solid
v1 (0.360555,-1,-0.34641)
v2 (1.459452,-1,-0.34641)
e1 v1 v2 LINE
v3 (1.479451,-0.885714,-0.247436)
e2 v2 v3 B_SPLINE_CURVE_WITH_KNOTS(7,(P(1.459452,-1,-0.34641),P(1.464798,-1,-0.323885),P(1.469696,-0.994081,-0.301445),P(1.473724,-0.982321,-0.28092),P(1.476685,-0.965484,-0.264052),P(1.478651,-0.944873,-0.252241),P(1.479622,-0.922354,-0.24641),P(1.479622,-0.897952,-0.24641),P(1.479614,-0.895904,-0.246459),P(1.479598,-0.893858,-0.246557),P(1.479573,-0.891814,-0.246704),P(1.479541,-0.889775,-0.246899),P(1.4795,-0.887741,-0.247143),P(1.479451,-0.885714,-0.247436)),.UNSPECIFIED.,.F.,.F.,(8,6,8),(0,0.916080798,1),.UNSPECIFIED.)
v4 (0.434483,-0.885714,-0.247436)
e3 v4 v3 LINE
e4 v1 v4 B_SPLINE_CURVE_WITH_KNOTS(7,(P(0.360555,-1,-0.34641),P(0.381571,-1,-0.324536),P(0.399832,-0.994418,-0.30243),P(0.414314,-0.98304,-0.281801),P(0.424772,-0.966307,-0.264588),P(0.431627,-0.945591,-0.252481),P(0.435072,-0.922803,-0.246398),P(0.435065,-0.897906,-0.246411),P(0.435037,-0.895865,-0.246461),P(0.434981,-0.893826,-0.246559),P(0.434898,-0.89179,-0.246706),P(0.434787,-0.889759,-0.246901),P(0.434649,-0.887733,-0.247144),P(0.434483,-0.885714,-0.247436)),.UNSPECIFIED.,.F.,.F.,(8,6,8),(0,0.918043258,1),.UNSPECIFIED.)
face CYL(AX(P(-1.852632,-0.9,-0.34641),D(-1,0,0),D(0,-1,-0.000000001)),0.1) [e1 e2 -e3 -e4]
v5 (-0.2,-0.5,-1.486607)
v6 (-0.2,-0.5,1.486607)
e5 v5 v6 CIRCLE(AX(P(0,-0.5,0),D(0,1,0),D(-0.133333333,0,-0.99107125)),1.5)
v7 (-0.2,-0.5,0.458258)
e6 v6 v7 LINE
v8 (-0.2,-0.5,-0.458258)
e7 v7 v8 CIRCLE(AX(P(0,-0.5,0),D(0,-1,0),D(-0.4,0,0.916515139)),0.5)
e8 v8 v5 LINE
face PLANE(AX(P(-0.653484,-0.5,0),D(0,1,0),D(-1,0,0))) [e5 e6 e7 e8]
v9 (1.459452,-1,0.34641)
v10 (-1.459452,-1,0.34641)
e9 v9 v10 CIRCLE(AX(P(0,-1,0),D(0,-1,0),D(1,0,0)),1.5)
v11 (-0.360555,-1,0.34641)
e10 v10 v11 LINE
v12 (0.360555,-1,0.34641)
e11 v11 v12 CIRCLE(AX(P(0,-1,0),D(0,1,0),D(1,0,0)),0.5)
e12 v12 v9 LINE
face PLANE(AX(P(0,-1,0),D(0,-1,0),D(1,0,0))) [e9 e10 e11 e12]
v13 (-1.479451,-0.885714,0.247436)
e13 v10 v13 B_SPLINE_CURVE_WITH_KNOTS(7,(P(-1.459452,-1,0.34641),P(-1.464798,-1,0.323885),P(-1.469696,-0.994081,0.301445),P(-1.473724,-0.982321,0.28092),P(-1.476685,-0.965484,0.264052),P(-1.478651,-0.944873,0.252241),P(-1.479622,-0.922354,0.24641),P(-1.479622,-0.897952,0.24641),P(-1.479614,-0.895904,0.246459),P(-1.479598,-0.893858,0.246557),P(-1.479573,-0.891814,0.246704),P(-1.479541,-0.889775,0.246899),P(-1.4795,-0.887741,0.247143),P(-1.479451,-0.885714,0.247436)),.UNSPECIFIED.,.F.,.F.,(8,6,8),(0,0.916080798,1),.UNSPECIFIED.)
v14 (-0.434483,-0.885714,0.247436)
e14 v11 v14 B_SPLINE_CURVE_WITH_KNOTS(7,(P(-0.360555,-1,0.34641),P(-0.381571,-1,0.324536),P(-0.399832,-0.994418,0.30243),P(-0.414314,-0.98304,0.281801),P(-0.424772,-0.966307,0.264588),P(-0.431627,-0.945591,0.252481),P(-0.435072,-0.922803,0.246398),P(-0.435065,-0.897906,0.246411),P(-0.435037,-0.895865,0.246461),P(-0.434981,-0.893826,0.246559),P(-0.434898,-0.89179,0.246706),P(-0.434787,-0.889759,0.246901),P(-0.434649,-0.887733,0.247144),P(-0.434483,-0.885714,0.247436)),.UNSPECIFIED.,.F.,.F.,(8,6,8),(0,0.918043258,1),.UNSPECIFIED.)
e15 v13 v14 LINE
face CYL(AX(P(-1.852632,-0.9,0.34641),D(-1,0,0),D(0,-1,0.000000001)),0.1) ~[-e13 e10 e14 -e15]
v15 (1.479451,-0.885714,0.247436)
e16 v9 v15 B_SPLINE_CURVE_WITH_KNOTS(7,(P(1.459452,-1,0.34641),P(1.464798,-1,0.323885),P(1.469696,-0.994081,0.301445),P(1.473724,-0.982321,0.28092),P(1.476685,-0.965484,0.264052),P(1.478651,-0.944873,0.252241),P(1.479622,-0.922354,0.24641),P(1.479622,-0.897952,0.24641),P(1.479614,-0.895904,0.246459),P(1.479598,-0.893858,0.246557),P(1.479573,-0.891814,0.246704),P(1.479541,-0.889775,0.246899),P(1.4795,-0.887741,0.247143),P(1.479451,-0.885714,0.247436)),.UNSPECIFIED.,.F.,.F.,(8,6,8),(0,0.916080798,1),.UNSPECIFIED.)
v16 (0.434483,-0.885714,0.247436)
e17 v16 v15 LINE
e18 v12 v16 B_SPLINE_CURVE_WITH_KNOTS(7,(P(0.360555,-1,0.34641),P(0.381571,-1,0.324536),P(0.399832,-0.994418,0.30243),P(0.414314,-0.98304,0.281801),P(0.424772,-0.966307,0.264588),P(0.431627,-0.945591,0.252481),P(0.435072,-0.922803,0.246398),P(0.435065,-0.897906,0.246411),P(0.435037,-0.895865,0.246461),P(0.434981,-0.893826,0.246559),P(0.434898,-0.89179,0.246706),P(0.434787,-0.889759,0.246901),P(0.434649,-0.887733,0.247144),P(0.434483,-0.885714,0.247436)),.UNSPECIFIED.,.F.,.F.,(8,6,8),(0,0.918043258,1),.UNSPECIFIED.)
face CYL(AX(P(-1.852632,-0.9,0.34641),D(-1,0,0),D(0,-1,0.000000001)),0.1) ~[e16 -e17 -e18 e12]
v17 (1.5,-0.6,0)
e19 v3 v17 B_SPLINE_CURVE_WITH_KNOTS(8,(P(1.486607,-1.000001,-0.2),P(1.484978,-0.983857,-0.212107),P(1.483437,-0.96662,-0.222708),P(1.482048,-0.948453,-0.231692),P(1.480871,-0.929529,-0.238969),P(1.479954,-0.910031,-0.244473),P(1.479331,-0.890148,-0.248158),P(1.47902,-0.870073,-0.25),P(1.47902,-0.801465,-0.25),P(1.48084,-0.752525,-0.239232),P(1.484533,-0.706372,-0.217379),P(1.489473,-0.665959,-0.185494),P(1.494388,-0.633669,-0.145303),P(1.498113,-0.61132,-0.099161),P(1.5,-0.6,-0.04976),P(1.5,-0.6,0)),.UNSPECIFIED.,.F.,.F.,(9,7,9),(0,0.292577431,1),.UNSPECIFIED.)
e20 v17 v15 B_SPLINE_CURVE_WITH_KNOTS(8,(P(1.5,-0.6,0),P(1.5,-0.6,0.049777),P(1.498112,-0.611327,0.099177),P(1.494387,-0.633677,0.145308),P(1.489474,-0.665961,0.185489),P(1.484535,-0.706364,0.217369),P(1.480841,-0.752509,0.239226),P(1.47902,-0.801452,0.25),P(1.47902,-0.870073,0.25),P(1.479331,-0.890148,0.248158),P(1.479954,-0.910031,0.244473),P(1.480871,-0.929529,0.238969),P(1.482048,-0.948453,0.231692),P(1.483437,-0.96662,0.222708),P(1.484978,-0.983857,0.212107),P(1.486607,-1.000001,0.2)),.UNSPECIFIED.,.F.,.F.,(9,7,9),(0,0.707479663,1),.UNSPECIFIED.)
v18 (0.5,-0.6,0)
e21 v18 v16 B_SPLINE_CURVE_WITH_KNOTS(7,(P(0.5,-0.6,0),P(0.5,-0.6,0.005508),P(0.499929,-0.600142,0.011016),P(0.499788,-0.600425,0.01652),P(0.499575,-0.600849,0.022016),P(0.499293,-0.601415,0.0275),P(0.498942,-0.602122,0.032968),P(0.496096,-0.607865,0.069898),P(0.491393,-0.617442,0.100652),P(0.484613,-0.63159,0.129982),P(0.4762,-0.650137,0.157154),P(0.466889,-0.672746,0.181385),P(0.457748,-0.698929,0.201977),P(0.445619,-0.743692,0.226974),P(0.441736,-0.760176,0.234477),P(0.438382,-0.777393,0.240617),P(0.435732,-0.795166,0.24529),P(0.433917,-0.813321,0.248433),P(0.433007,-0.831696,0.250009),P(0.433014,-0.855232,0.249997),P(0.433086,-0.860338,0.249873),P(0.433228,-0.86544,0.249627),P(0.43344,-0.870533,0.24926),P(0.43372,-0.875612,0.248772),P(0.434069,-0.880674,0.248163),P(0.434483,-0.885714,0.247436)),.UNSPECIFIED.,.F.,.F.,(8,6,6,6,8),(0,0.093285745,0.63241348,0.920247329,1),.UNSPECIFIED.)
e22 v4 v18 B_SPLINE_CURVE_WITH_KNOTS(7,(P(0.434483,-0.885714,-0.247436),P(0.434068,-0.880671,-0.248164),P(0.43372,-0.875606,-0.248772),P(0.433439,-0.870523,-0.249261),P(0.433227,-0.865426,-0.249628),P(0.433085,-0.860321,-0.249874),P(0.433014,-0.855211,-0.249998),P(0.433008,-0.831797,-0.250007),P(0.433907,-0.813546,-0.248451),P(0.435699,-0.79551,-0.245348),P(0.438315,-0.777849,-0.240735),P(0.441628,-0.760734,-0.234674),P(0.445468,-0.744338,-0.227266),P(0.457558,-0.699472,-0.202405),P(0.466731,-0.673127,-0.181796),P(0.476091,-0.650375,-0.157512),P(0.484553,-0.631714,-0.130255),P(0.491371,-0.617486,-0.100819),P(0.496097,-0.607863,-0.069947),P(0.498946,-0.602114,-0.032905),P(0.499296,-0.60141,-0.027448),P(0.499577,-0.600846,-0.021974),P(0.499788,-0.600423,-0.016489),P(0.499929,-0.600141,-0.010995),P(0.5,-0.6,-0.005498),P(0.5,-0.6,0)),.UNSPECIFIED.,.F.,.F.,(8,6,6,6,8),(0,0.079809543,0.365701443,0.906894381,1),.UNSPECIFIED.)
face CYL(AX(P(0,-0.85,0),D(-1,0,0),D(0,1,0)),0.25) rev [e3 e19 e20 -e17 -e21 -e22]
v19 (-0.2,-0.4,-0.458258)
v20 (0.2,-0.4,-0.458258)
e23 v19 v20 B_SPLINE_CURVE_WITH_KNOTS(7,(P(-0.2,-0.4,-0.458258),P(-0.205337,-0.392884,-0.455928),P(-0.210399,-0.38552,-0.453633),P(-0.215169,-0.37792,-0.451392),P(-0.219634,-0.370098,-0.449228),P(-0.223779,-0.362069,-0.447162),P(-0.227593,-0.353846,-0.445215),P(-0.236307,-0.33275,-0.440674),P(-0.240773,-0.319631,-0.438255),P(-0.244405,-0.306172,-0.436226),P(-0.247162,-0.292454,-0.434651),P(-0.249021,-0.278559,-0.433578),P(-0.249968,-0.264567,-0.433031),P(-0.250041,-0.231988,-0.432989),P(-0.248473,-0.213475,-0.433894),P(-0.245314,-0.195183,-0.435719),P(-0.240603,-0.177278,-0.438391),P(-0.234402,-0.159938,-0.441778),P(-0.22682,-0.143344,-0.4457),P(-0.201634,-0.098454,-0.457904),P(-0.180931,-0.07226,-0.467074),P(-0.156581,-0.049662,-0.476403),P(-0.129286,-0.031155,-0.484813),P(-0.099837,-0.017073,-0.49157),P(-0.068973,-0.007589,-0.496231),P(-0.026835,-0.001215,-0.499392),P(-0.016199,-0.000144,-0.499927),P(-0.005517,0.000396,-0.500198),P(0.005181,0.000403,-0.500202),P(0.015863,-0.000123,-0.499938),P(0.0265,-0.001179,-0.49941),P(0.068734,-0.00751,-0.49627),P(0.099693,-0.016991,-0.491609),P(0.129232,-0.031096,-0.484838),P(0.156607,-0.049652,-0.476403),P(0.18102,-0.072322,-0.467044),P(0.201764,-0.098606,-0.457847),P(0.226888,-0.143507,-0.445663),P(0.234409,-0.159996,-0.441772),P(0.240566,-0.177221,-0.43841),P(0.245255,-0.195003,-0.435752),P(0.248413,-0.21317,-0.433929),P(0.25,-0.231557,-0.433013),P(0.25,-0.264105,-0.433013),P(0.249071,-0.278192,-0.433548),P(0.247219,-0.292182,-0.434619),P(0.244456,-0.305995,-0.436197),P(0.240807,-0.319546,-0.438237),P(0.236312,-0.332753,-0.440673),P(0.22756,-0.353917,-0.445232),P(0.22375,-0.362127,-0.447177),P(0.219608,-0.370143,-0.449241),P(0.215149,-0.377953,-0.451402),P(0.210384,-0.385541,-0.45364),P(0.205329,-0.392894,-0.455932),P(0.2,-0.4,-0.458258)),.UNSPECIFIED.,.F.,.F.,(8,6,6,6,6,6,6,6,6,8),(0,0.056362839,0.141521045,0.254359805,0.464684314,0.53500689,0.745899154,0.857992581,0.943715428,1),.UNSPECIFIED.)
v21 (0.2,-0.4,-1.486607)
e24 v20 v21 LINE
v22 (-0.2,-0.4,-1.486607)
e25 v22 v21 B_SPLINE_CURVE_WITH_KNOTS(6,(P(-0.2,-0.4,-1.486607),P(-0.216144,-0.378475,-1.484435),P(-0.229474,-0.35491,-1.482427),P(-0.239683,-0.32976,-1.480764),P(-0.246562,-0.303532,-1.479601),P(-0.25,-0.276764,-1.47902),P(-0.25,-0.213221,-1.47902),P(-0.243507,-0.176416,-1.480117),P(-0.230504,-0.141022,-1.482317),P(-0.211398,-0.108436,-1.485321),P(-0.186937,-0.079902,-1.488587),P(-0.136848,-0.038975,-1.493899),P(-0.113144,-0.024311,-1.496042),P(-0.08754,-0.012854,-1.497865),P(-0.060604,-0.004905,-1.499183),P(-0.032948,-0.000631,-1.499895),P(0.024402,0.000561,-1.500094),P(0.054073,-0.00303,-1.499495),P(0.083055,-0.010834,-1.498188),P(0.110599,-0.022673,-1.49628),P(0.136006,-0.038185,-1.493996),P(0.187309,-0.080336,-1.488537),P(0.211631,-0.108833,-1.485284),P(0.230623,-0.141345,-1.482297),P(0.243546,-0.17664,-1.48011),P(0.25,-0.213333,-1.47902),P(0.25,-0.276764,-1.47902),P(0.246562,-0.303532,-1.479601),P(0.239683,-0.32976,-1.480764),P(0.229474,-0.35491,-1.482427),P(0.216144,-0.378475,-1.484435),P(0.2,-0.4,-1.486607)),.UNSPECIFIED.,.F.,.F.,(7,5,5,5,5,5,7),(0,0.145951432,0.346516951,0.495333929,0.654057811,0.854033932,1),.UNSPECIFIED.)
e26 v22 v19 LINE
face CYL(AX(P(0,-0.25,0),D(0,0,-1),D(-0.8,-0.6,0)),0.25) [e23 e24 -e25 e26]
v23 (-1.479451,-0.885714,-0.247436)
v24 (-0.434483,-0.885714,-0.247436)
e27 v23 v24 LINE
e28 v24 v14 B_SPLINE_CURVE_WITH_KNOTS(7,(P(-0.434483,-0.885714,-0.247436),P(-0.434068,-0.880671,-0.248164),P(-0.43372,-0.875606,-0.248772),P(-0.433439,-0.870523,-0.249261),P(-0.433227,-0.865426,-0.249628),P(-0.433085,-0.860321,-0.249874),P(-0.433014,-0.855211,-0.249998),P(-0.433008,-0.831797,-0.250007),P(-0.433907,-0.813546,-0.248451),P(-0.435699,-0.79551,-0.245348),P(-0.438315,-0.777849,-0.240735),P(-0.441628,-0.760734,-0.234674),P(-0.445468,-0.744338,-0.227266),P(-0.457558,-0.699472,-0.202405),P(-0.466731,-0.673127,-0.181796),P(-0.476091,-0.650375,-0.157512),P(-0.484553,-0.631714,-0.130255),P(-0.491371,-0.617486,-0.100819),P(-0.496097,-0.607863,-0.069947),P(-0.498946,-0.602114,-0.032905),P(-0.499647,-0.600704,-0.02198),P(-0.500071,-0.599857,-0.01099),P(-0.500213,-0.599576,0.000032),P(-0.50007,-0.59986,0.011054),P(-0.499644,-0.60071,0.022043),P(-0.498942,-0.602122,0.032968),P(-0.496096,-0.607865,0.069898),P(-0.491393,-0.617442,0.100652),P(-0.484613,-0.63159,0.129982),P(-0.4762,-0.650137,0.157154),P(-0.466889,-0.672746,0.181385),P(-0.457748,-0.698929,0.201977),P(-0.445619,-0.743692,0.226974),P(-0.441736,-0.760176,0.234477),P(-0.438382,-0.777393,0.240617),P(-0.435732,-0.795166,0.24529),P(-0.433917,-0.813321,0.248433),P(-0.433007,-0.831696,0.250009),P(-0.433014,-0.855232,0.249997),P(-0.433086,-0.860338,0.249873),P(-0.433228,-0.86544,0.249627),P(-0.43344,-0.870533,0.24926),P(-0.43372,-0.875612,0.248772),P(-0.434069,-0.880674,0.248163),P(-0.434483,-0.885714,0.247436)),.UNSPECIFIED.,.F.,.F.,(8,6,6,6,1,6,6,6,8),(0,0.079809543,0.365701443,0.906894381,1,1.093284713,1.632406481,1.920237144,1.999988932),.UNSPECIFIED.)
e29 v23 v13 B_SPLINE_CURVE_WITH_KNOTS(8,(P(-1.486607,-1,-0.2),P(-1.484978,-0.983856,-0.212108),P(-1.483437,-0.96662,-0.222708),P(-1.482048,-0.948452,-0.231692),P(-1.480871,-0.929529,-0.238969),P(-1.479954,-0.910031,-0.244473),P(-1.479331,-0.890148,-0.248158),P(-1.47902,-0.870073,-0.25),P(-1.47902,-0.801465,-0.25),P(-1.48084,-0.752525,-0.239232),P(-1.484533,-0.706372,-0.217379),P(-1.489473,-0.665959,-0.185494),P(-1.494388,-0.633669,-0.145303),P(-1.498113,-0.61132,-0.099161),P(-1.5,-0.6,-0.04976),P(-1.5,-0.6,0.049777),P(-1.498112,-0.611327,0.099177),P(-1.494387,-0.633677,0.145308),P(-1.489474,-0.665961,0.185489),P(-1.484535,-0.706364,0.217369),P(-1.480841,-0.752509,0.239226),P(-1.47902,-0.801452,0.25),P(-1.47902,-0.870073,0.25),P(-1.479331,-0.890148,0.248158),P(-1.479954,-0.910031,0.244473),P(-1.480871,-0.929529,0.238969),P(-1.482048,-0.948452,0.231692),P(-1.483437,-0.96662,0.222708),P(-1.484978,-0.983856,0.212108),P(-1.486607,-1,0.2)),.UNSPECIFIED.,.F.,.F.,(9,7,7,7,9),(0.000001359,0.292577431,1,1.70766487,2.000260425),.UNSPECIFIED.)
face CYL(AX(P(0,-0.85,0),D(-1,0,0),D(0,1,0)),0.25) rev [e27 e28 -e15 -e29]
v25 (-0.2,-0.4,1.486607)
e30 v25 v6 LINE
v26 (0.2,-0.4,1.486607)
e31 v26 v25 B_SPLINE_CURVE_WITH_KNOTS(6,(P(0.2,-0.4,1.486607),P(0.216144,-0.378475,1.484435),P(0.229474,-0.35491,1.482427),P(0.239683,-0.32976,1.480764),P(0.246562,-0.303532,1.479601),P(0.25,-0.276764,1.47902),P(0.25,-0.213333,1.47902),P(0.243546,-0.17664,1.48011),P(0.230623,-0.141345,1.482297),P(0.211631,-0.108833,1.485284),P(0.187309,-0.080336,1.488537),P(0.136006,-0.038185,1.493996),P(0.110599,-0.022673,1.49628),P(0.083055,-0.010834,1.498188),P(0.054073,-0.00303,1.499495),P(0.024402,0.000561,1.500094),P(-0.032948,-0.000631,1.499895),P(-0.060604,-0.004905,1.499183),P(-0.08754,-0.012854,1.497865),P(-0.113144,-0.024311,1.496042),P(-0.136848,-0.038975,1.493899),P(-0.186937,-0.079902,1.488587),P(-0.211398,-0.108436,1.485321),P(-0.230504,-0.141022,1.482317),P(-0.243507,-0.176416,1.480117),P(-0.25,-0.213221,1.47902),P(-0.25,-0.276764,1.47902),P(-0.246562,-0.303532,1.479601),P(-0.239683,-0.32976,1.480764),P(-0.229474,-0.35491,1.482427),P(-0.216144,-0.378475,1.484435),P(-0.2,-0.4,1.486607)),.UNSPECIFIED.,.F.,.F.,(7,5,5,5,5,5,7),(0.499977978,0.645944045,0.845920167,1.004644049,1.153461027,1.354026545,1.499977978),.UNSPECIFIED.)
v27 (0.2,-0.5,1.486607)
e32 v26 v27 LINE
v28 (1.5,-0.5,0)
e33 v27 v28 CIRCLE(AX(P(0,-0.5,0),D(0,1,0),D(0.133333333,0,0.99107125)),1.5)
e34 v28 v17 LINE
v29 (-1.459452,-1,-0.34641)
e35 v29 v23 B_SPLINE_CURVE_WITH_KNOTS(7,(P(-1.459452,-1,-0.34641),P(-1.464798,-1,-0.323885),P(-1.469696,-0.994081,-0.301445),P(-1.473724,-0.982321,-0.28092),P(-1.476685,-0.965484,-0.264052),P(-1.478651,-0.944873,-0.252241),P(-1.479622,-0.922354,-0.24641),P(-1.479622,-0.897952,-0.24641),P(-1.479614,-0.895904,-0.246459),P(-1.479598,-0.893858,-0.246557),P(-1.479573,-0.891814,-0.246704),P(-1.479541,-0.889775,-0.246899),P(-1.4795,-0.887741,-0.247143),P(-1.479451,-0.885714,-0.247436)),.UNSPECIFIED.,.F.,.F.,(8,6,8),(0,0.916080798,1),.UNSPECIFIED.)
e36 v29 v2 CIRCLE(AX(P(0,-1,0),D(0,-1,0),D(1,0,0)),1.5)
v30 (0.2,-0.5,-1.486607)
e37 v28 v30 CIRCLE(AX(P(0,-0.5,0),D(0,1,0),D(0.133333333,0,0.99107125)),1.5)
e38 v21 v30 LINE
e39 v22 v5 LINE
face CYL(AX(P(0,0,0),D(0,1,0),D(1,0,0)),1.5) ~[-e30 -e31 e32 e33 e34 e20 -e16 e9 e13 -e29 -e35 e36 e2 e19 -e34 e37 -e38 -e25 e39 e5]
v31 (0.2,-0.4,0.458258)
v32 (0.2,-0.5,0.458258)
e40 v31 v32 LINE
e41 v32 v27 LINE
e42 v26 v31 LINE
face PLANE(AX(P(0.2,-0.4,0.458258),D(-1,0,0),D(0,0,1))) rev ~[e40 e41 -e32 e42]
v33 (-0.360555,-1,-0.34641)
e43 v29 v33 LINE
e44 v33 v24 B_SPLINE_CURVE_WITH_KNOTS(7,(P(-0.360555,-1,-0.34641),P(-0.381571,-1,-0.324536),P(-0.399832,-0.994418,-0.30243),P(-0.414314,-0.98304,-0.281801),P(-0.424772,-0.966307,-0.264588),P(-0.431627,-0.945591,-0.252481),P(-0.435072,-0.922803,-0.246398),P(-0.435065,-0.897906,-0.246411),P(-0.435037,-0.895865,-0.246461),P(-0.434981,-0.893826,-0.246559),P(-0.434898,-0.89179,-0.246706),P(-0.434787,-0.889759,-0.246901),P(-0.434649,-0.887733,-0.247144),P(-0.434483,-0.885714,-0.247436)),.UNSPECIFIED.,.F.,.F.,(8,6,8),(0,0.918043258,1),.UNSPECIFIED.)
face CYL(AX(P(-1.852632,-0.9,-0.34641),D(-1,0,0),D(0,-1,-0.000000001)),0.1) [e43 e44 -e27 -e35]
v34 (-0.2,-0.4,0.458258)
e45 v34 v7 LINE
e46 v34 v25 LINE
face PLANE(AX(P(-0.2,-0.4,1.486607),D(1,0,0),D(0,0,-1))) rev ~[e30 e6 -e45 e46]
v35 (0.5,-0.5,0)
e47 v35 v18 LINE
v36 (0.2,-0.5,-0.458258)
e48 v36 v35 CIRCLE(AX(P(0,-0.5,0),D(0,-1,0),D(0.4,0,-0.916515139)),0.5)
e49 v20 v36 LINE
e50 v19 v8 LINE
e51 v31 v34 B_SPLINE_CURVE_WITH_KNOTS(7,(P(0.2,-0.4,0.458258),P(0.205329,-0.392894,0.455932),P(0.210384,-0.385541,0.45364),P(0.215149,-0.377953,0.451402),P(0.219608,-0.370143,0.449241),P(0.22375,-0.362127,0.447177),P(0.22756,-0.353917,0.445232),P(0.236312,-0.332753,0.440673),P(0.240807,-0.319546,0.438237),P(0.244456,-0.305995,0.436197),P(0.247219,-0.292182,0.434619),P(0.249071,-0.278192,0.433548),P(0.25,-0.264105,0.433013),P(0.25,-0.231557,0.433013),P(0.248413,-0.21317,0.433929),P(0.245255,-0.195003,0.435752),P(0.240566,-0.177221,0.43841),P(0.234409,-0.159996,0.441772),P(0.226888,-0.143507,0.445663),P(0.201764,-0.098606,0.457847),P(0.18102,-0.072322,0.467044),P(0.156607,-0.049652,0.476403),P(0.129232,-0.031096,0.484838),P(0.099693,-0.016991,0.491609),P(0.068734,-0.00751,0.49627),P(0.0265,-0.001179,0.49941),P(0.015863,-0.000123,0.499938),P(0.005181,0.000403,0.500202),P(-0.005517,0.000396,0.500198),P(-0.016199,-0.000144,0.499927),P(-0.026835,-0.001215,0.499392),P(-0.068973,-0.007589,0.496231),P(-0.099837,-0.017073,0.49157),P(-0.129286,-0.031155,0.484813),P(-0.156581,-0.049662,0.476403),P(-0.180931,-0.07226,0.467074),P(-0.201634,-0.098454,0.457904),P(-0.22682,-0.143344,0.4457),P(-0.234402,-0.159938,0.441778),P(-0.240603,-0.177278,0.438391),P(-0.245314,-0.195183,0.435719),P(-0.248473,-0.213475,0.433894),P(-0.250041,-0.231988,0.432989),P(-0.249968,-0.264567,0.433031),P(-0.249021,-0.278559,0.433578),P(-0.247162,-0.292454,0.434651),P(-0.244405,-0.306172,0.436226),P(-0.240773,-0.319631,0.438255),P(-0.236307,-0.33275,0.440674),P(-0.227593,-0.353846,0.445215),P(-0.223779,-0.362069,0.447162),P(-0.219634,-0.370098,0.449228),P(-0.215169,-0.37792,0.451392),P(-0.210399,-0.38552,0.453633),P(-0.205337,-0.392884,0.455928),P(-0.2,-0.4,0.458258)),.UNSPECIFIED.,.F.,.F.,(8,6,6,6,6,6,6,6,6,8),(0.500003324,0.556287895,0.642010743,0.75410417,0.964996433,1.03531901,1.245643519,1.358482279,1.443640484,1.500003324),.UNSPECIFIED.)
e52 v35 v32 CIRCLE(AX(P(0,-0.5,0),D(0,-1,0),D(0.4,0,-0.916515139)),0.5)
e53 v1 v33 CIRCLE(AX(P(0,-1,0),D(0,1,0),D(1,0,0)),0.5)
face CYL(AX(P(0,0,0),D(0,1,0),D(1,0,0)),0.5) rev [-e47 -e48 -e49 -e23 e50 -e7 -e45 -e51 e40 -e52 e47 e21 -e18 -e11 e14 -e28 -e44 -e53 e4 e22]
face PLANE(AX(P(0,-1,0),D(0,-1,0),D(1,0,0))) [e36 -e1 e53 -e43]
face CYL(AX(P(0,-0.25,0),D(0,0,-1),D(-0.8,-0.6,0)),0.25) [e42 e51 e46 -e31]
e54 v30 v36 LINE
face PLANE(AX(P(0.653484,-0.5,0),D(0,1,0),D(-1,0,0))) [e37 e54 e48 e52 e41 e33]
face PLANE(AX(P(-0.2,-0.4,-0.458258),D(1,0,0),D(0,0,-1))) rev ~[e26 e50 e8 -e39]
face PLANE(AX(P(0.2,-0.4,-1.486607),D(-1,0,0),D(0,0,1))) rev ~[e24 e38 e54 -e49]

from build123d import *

# Parameters (mm, degrees)
F0_R          = 1.5
F1_DEPTH      = 1
F3_DEPTH      = 1.501
F3_DEPTH_BACK = 25
F4_R          = 0.25
F5_DEPTH      = 1.5010001
F5_DEPTH_BACK = 25
F6_T1_DEPTH   = 3.705264557
F7_R          = 0.5
F8_DEPTH      = 1.0010001
F10_DEPTH     = 0.1


# Not quite as in the source:
# - a fillet or chamfer that OpenCascade refuses, or shapes differently, is made with other operations: its cross-section is extruded or revolved along the edge and cut away or added


with BuildPart() as f1:
    # F0 (on Front) → F1 (new body)
    with BuildSketch(Plane.XZ):
        Circle(F0_R)
    extrude(amount=F1_DEPTH)

    # F2 (on Top) → F3 (cut, two sides)
    with BuildSketch(Plane.XY) as f3_sk:
        with BuildLine():
            ThreePointArc((-0.2, -0.4), (0, 0), (0.2, -0.4))
            Line((0.2, -0.4), (1.99, -0.4))
            Line((1.99, -0.4), (1.99, 0.99))
            Line((1.99, 0.99), (-1.99, 0.99))
            Line((-1.99, 0.99), (-1.99, -0.4))
            Line((-1.99, -0.4), (-0.2, -0.4))
        make_face()
    extrude(amount=-F3_DEPTH, mode=Mode.SUBTRACT)
    extrude(f3_sk.sketch, amount=F3_DEPTH_BACK, mode=Mode.SUBTRACT)

    # F4 (on Right) → F5 (cut, two sides)
    with BuildSketch(Plane.YZ) as f5_sk:
        with Locations((-0.85, 0)):
            Circle(F4_R)
    extrude(amount=-F5_DEPTH, mode=Mode.SUBTRACT)
    extrude(f5_sk.sketch, amount=F5_DEPTH_BACK, mode=Mode.SUBTRACT)

    # F6: fillet of radius 0.1 on 2 edges, made by hand

    # F6_s2 → F6_t1 (cut)
    with BuildSketch(Plane.YZ.offset(-1.8526322785)):
        with BuildLine():
            ThreePointArc((-1, -0.3464101615), (-0.9654653671, -0.2708172669), (-0.8857142857, -0.2474358297))
            ThreePointArc((-0.8857142857, -0.2474358297), (-0.9458383455, -0.2309004364), (-1, -0.2))
            Line((-1, -0.2), (-1, -0.3464101615))
        make_face()
        with BuildLine():
            ThreePointArc((-1, 0.3464101615), (-0.9654653671, 0.2708172669), (-0.8857142857, 0.2474358297))
            ThreePointArc((-0.8857142857, 0.2474358297), (-0.9458383455, 0.2309004364), (-1, 0.2))
            Line((-1, 0.2), (-1, 0.3464101615))
        make_face()
    extrude(amount=F6_T1_DEPTH, mode=Mode.SUBTRACT)

    # F7 (on Front) → F8 (cut, through all)
    with BuildSketch(Plane.XZ):
        Circle(F7_R)
    extrude(amount=F8_DEPTH, mode=Mode.SUBTRACT)

    # F9 (on face) → F10 (cut)
    with BuildSketch(Plane(origin=(0, -0.4, 0), x_dir=(-1, 0, 0), z_dir=(0, 1, 0))):
        with BuildLine():
            ThreePointArc((0.2, 0.4582575695), (0.5, 0), (0.2, -0.4582575695))
            Line((0.2, -0.4582575695), (0.2, -1.4866068747))
            ThreePointArc((0.2, -1.4866068747), (1.5, 0), (0.2, 1.4866068747))
            Line((0.2, 1.4866068747), (0.2, 0.4582575695))
        make_face()
        with BuildLine():
            ThreePointArc((-0.2, -0.4582575695), (-0.5, 0), (-0.2, 0.4582575695))
            Line((-0.2, 0.4582575695), (-0.2, 1.4866068747))
            ThreePointArc((-0.2, 1.4866068747), (-1.5, 0), (-0.2, -1.4866068747))
            Line((-0.2, -1.4866068747), (-0.2, -0.4582575695))
        make_face()
    extrude(amount=-F10_DEPTH, mode=Mode.SUBTRACT)


solid = f1.part
